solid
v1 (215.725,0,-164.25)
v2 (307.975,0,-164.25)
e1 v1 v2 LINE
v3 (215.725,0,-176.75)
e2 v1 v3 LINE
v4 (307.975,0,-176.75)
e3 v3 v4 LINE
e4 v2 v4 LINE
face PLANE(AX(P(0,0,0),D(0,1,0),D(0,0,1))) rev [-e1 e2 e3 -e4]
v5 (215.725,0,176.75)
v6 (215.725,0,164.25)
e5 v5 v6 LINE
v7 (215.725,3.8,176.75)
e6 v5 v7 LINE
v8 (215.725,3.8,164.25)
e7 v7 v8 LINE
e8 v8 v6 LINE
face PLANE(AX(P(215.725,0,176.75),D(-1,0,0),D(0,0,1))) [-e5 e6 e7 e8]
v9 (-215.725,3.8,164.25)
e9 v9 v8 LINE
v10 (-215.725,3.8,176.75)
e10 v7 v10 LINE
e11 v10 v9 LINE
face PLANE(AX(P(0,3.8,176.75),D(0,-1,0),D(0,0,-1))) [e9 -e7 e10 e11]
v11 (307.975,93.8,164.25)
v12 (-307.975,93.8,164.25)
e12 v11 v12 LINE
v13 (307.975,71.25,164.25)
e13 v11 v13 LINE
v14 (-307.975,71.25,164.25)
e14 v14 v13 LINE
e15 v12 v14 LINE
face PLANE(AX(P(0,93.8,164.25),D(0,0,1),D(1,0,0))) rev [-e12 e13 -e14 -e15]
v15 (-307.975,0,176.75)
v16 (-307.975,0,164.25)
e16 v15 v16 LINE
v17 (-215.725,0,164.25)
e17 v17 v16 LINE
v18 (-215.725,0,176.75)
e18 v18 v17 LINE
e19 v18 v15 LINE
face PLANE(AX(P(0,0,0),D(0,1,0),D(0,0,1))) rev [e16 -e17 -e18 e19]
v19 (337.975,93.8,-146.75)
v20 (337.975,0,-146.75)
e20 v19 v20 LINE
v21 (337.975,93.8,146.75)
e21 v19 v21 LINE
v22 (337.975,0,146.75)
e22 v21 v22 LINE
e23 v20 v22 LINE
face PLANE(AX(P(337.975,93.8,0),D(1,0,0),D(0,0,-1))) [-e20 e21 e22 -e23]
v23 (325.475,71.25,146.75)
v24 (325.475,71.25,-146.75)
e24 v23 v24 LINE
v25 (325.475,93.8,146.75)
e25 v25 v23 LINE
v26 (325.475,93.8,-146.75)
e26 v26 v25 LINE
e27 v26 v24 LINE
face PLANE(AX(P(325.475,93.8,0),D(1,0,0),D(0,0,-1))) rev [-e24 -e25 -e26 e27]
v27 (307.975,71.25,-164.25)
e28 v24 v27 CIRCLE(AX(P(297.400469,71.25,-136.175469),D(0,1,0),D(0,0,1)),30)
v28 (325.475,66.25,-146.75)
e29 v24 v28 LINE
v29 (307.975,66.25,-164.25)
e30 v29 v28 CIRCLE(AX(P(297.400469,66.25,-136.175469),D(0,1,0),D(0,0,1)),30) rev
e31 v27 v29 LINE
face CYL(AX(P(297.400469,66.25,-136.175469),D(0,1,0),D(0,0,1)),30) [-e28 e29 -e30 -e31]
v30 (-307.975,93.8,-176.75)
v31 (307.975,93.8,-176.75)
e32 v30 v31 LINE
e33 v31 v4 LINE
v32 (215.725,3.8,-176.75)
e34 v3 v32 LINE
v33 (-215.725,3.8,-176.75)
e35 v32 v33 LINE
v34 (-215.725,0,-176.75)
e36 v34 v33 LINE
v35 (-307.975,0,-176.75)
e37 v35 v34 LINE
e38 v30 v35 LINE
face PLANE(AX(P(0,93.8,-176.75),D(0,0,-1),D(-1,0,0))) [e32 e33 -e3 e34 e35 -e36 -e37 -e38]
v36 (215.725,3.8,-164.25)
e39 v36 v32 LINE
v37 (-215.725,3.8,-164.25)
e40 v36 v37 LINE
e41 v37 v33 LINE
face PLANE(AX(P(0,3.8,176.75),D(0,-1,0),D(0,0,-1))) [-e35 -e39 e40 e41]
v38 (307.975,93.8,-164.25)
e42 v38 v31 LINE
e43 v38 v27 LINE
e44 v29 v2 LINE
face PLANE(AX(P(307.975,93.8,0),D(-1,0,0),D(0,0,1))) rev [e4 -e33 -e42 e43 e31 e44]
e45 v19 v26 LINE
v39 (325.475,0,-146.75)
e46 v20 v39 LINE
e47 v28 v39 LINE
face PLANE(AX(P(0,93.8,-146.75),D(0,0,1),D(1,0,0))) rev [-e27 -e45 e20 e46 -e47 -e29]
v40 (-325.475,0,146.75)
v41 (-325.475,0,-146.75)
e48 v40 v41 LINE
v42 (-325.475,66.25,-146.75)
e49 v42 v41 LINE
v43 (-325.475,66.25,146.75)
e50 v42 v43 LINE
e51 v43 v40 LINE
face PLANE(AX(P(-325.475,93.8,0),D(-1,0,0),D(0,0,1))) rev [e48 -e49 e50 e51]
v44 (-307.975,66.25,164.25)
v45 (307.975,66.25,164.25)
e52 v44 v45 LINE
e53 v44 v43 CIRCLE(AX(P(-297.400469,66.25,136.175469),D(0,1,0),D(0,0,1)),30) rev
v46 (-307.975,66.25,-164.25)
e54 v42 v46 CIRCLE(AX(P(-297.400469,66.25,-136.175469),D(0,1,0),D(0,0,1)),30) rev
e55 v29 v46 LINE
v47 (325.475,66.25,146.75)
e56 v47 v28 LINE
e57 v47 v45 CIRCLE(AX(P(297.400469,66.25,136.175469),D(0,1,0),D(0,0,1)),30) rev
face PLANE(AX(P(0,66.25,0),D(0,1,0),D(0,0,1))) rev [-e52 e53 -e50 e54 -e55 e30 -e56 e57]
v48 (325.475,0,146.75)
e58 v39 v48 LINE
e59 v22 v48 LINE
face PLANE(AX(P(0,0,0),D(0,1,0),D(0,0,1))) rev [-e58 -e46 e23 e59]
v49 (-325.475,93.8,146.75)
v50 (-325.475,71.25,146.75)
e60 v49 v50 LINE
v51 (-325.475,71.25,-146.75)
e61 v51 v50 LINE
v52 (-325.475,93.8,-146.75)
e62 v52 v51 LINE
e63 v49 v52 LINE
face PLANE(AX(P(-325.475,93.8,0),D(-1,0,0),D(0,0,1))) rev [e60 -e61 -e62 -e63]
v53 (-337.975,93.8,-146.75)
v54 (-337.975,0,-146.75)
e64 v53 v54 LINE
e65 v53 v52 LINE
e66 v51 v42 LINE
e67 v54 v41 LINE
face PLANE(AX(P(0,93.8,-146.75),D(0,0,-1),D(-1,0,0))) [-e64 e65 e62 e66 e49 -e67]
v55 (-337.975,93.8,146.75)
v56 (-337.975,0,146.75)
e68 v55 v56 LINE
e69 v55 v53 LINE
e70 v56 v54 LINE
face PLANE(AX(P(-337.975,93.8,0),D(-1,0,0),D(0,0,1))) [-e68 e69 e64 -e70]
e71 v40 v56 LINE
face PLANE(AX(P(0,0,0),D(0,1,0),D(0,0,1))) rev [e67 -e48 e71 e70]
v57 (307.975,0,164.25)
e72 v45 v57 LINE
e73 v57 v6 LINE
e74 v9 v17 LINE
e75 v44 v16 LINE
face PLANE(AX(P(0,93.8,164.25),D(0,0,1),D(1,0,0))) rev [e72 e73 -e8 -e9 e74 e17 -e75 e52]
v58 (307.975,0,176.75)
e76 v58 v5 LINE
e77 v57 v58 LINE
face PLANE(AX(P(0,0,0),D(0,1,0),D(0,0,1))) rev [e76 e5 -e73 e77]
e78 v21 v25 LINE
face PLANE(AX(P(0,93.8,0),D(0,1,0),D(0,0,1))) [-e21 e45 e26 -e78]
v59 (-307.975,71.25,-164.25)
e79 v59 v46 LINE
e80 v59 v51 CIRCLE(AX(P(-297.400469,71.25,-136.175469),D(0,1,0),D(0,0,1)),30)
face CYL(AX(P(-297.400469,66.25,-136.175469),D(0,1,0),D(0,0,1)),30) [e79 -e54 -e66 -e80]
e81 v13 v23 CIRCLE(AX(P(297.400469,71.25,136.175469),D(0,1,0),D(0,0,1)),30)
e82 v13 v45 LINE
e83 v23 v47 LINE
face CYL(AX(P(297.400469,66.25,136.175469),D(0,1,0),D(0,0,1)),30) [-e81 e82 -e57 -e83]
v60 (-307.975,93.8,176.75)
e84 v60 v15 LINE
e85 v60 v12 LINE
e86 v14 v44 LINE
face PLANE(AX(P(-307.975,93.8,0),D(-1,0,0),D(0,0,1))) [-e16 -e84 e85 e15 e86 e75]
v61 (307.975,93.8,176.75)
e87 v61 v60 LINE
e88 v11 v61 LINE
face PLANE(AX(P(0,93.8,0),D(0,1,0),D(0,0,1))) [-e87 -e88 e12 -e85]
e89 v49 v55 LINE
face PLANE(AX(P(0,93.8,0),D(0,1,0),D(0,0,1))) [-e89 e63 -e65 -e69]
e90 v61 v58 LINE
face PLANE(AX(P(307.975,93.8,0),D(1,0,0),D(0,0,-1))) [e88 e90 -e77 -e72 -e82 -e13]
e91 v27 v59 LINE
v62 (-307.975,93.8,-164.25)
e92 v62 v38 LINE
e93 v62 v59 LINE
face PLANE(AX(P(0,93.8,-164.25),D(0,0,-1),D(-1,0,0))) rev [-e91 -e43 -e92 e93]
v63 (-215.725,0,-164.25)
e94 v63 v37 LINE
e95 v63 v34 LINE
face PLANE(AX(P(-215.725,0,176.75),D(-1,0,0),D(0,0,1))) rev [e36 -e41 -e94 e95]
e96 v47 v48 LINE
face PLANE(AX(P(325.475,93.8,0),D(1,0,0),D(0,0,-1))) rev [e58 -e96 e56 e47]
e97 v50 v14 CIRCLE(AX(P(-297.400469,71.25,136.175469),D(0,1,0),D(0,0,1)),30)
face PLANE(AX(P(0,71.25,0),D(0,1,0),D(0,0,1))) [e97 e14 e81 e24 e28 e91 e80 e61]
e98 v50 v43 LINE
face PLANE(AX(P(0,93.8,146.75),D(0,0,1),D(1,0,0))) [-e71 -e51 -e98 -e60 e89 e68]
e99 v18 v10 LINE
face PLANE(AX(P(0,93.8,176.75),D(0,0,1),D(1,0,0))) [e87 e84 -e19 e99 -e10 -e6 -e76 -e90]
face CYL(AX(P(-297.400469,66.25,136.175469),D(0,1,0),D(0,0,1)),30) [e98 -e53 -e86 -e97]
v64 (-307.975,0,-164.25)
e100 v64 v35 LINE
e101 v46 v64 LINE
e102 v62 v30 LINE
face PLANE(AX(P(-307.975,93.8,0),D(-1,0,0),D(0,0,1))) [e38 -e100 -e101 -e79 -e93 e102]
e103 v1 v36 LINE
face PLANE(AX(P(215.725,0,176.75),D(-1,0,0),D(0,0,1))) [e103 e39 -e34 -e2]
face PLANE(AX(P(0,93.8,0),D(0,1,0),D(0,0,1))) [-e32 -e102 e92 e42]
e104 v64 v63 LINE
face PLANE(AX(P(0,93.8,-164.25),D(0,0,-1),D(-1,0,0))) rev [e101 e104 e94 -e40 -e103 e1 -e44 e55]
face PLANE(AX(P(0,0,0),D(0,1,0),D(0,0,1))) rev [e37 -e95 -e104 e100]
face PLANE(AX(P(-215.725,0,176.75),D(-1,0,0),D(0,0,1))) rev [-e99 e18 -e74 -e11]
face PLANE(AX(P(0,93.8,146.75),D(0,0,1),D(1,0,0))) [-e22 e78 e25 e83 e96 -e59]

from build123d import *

# Parameters (mm, degrees)
SKETCH1_W             = 12.5
SKETCH1_H             = 293.5
BOSS_EXTRUDE1_DEPTH   = 93.8
SKETCH1_W_2           = 615.95
SKETCH1_H_2           = 12.5
BOSS_EXTRUDE1_2_DEPTH = 93.8
BOSS_EXTRUDE1_3_DEPTH = 93.8
BOSS_EXTRUDE1_4_DEPTH = 93.8
SKETCH2_W             = 650.95
SKETCH2_H             = 328.5
BOSS_EXTRUDE2_DEPTH   = 5
FILLET2_R             = 30
SKETCH4_W             = 215.725
SKETCH4_H             = 3.8
CUT_EXTRUDE1_DEPTH    = 498.983725261


with BuildPart() as part:
    # Sketch1 → Boss-Extrude1 (new body)
    with BuildSketch(Plane(origin=(0, 0, 0), x_dir=(1, 0, 0), z_dir=(0, 1, 0))):
        with Locations((-331.725, 0)):
            Rectangle(SKETCH1_W, SKETCH1_H)
    extrude(amount=BOSS_EXTRUDE1_DEPTH)



with BuildPart() as body_2:
    # Sketch1 → Boss-Extrude1 2 (new body)
    with BuildSketch(Plane(origin=(0, 0, 0), x_dir=(1, 0, 0), z_dir=(0, 1, 0))):
        with Locations((0, 170.5)):
            Rectangle(SKETCH1_W_2, SKETCH1_H_2)
    extrude(amount=BOSS_EXTRUDE1_2_DEPTH)


with BuildPart() as body_3:
    # Sketch1 → Boss-Extrude1 3 (new body)
    with BuildSketch(Plane(origin=(0, 0, 0), x_dir=(1, 0, 0), z_dir=(0, 1, 0))):
        with Locations((331.725, 0)):
            Rectangle(SKETCH1_W, SKETCH1_H)
    extrude(amount=BOSS_EXTRUDE1_3_DEPTH)


with BuildPart() as body_4:
    # Sketch1 → Boss-Extrude1 4 (new body)
    with BuildSketch(Plane(origin=(0, 0, 0), x_dir=(1, 0, 0), z_dir=(0, 1, 0))):
        with Locations((0, -170.5)):
            Rectangle(SKETCH1_W_2, SKETCH1_H_2)
    extrude(amount=BOSS_EXTRUDE1_4_DEPTH)


with BuildPart() as part_1:
    add(part.part)

    add(body_2.part)  # Boss-Extrude2 merges body 2

    add(body_3.part)  # Boss-Extrude2 merges body 3

    add(body_4.part)  # Boss-Extrude2 merges body 4
    # Sketch2 → Boss-Extrude2 (add)
    with BuildSketch(Plane(origin=(0, 71.25, 0), x_dir=(1, 0, 0), z_dir=(0, 1, 0))):
        Rectangle(SKETCH2_W, SKETCH2_H)
    extrude(amount=-BOSS_EXTRUDE2_DEPTH)

    # Fillet2
    # the kernel refuses this fillet: 30 mm, written as the material it takes off along each edge
    with BuildSketch(Plane(origin=(-325.475, 115, 164.25), x_dir=(1, 0, 0), z_dir=(0, -1, 0)), Plane(origin=(-325.475, 115, -164.25), x_dir=(0, 0, 1), z_dir=(0, -1, 0)), Plane(origin=(325.475, 115, -164.25), x_dir=(-1, 0, 0), z_dir=(0, -1, 0)), Plane(origin=(325.475, 115, 164.25), x_dir=(0, 0, -1), z_dir=(0, -1, 0))) as fillet2_piece_1:
        with BuildLine():
            CenterArc((28.074531042, -28.074531042), FILLET2_R, 110.63934566, 48.721308679)
            Line((0, -17.5), (0, 0))
            Line((0, 0), (17.5, 0))
        make_face()
    extrude(amount=92.5, mode=Mode.SUBTRACT)

    # Sketch4 → Cut-Extrude1 (cut, through all)
    with BuildSketch(Plane(origin=(0, 0, -176.75), x_dir=(-1, 0, 0), z_dir=(0, 0, -1))):
        with Locations((-107.8625, 1.9)):
            Rectangle(SKETCH4_W, SKETCH4_H)
        with Locations((107.8625, 1.9)):
            Rectangle(SKETCH4_W, SKETCH4_H)
    extrude(amount=-CUT_EXTRUDE1_DEPTH, mode=Mode.SUBTRACT)


solid = part_1.part
